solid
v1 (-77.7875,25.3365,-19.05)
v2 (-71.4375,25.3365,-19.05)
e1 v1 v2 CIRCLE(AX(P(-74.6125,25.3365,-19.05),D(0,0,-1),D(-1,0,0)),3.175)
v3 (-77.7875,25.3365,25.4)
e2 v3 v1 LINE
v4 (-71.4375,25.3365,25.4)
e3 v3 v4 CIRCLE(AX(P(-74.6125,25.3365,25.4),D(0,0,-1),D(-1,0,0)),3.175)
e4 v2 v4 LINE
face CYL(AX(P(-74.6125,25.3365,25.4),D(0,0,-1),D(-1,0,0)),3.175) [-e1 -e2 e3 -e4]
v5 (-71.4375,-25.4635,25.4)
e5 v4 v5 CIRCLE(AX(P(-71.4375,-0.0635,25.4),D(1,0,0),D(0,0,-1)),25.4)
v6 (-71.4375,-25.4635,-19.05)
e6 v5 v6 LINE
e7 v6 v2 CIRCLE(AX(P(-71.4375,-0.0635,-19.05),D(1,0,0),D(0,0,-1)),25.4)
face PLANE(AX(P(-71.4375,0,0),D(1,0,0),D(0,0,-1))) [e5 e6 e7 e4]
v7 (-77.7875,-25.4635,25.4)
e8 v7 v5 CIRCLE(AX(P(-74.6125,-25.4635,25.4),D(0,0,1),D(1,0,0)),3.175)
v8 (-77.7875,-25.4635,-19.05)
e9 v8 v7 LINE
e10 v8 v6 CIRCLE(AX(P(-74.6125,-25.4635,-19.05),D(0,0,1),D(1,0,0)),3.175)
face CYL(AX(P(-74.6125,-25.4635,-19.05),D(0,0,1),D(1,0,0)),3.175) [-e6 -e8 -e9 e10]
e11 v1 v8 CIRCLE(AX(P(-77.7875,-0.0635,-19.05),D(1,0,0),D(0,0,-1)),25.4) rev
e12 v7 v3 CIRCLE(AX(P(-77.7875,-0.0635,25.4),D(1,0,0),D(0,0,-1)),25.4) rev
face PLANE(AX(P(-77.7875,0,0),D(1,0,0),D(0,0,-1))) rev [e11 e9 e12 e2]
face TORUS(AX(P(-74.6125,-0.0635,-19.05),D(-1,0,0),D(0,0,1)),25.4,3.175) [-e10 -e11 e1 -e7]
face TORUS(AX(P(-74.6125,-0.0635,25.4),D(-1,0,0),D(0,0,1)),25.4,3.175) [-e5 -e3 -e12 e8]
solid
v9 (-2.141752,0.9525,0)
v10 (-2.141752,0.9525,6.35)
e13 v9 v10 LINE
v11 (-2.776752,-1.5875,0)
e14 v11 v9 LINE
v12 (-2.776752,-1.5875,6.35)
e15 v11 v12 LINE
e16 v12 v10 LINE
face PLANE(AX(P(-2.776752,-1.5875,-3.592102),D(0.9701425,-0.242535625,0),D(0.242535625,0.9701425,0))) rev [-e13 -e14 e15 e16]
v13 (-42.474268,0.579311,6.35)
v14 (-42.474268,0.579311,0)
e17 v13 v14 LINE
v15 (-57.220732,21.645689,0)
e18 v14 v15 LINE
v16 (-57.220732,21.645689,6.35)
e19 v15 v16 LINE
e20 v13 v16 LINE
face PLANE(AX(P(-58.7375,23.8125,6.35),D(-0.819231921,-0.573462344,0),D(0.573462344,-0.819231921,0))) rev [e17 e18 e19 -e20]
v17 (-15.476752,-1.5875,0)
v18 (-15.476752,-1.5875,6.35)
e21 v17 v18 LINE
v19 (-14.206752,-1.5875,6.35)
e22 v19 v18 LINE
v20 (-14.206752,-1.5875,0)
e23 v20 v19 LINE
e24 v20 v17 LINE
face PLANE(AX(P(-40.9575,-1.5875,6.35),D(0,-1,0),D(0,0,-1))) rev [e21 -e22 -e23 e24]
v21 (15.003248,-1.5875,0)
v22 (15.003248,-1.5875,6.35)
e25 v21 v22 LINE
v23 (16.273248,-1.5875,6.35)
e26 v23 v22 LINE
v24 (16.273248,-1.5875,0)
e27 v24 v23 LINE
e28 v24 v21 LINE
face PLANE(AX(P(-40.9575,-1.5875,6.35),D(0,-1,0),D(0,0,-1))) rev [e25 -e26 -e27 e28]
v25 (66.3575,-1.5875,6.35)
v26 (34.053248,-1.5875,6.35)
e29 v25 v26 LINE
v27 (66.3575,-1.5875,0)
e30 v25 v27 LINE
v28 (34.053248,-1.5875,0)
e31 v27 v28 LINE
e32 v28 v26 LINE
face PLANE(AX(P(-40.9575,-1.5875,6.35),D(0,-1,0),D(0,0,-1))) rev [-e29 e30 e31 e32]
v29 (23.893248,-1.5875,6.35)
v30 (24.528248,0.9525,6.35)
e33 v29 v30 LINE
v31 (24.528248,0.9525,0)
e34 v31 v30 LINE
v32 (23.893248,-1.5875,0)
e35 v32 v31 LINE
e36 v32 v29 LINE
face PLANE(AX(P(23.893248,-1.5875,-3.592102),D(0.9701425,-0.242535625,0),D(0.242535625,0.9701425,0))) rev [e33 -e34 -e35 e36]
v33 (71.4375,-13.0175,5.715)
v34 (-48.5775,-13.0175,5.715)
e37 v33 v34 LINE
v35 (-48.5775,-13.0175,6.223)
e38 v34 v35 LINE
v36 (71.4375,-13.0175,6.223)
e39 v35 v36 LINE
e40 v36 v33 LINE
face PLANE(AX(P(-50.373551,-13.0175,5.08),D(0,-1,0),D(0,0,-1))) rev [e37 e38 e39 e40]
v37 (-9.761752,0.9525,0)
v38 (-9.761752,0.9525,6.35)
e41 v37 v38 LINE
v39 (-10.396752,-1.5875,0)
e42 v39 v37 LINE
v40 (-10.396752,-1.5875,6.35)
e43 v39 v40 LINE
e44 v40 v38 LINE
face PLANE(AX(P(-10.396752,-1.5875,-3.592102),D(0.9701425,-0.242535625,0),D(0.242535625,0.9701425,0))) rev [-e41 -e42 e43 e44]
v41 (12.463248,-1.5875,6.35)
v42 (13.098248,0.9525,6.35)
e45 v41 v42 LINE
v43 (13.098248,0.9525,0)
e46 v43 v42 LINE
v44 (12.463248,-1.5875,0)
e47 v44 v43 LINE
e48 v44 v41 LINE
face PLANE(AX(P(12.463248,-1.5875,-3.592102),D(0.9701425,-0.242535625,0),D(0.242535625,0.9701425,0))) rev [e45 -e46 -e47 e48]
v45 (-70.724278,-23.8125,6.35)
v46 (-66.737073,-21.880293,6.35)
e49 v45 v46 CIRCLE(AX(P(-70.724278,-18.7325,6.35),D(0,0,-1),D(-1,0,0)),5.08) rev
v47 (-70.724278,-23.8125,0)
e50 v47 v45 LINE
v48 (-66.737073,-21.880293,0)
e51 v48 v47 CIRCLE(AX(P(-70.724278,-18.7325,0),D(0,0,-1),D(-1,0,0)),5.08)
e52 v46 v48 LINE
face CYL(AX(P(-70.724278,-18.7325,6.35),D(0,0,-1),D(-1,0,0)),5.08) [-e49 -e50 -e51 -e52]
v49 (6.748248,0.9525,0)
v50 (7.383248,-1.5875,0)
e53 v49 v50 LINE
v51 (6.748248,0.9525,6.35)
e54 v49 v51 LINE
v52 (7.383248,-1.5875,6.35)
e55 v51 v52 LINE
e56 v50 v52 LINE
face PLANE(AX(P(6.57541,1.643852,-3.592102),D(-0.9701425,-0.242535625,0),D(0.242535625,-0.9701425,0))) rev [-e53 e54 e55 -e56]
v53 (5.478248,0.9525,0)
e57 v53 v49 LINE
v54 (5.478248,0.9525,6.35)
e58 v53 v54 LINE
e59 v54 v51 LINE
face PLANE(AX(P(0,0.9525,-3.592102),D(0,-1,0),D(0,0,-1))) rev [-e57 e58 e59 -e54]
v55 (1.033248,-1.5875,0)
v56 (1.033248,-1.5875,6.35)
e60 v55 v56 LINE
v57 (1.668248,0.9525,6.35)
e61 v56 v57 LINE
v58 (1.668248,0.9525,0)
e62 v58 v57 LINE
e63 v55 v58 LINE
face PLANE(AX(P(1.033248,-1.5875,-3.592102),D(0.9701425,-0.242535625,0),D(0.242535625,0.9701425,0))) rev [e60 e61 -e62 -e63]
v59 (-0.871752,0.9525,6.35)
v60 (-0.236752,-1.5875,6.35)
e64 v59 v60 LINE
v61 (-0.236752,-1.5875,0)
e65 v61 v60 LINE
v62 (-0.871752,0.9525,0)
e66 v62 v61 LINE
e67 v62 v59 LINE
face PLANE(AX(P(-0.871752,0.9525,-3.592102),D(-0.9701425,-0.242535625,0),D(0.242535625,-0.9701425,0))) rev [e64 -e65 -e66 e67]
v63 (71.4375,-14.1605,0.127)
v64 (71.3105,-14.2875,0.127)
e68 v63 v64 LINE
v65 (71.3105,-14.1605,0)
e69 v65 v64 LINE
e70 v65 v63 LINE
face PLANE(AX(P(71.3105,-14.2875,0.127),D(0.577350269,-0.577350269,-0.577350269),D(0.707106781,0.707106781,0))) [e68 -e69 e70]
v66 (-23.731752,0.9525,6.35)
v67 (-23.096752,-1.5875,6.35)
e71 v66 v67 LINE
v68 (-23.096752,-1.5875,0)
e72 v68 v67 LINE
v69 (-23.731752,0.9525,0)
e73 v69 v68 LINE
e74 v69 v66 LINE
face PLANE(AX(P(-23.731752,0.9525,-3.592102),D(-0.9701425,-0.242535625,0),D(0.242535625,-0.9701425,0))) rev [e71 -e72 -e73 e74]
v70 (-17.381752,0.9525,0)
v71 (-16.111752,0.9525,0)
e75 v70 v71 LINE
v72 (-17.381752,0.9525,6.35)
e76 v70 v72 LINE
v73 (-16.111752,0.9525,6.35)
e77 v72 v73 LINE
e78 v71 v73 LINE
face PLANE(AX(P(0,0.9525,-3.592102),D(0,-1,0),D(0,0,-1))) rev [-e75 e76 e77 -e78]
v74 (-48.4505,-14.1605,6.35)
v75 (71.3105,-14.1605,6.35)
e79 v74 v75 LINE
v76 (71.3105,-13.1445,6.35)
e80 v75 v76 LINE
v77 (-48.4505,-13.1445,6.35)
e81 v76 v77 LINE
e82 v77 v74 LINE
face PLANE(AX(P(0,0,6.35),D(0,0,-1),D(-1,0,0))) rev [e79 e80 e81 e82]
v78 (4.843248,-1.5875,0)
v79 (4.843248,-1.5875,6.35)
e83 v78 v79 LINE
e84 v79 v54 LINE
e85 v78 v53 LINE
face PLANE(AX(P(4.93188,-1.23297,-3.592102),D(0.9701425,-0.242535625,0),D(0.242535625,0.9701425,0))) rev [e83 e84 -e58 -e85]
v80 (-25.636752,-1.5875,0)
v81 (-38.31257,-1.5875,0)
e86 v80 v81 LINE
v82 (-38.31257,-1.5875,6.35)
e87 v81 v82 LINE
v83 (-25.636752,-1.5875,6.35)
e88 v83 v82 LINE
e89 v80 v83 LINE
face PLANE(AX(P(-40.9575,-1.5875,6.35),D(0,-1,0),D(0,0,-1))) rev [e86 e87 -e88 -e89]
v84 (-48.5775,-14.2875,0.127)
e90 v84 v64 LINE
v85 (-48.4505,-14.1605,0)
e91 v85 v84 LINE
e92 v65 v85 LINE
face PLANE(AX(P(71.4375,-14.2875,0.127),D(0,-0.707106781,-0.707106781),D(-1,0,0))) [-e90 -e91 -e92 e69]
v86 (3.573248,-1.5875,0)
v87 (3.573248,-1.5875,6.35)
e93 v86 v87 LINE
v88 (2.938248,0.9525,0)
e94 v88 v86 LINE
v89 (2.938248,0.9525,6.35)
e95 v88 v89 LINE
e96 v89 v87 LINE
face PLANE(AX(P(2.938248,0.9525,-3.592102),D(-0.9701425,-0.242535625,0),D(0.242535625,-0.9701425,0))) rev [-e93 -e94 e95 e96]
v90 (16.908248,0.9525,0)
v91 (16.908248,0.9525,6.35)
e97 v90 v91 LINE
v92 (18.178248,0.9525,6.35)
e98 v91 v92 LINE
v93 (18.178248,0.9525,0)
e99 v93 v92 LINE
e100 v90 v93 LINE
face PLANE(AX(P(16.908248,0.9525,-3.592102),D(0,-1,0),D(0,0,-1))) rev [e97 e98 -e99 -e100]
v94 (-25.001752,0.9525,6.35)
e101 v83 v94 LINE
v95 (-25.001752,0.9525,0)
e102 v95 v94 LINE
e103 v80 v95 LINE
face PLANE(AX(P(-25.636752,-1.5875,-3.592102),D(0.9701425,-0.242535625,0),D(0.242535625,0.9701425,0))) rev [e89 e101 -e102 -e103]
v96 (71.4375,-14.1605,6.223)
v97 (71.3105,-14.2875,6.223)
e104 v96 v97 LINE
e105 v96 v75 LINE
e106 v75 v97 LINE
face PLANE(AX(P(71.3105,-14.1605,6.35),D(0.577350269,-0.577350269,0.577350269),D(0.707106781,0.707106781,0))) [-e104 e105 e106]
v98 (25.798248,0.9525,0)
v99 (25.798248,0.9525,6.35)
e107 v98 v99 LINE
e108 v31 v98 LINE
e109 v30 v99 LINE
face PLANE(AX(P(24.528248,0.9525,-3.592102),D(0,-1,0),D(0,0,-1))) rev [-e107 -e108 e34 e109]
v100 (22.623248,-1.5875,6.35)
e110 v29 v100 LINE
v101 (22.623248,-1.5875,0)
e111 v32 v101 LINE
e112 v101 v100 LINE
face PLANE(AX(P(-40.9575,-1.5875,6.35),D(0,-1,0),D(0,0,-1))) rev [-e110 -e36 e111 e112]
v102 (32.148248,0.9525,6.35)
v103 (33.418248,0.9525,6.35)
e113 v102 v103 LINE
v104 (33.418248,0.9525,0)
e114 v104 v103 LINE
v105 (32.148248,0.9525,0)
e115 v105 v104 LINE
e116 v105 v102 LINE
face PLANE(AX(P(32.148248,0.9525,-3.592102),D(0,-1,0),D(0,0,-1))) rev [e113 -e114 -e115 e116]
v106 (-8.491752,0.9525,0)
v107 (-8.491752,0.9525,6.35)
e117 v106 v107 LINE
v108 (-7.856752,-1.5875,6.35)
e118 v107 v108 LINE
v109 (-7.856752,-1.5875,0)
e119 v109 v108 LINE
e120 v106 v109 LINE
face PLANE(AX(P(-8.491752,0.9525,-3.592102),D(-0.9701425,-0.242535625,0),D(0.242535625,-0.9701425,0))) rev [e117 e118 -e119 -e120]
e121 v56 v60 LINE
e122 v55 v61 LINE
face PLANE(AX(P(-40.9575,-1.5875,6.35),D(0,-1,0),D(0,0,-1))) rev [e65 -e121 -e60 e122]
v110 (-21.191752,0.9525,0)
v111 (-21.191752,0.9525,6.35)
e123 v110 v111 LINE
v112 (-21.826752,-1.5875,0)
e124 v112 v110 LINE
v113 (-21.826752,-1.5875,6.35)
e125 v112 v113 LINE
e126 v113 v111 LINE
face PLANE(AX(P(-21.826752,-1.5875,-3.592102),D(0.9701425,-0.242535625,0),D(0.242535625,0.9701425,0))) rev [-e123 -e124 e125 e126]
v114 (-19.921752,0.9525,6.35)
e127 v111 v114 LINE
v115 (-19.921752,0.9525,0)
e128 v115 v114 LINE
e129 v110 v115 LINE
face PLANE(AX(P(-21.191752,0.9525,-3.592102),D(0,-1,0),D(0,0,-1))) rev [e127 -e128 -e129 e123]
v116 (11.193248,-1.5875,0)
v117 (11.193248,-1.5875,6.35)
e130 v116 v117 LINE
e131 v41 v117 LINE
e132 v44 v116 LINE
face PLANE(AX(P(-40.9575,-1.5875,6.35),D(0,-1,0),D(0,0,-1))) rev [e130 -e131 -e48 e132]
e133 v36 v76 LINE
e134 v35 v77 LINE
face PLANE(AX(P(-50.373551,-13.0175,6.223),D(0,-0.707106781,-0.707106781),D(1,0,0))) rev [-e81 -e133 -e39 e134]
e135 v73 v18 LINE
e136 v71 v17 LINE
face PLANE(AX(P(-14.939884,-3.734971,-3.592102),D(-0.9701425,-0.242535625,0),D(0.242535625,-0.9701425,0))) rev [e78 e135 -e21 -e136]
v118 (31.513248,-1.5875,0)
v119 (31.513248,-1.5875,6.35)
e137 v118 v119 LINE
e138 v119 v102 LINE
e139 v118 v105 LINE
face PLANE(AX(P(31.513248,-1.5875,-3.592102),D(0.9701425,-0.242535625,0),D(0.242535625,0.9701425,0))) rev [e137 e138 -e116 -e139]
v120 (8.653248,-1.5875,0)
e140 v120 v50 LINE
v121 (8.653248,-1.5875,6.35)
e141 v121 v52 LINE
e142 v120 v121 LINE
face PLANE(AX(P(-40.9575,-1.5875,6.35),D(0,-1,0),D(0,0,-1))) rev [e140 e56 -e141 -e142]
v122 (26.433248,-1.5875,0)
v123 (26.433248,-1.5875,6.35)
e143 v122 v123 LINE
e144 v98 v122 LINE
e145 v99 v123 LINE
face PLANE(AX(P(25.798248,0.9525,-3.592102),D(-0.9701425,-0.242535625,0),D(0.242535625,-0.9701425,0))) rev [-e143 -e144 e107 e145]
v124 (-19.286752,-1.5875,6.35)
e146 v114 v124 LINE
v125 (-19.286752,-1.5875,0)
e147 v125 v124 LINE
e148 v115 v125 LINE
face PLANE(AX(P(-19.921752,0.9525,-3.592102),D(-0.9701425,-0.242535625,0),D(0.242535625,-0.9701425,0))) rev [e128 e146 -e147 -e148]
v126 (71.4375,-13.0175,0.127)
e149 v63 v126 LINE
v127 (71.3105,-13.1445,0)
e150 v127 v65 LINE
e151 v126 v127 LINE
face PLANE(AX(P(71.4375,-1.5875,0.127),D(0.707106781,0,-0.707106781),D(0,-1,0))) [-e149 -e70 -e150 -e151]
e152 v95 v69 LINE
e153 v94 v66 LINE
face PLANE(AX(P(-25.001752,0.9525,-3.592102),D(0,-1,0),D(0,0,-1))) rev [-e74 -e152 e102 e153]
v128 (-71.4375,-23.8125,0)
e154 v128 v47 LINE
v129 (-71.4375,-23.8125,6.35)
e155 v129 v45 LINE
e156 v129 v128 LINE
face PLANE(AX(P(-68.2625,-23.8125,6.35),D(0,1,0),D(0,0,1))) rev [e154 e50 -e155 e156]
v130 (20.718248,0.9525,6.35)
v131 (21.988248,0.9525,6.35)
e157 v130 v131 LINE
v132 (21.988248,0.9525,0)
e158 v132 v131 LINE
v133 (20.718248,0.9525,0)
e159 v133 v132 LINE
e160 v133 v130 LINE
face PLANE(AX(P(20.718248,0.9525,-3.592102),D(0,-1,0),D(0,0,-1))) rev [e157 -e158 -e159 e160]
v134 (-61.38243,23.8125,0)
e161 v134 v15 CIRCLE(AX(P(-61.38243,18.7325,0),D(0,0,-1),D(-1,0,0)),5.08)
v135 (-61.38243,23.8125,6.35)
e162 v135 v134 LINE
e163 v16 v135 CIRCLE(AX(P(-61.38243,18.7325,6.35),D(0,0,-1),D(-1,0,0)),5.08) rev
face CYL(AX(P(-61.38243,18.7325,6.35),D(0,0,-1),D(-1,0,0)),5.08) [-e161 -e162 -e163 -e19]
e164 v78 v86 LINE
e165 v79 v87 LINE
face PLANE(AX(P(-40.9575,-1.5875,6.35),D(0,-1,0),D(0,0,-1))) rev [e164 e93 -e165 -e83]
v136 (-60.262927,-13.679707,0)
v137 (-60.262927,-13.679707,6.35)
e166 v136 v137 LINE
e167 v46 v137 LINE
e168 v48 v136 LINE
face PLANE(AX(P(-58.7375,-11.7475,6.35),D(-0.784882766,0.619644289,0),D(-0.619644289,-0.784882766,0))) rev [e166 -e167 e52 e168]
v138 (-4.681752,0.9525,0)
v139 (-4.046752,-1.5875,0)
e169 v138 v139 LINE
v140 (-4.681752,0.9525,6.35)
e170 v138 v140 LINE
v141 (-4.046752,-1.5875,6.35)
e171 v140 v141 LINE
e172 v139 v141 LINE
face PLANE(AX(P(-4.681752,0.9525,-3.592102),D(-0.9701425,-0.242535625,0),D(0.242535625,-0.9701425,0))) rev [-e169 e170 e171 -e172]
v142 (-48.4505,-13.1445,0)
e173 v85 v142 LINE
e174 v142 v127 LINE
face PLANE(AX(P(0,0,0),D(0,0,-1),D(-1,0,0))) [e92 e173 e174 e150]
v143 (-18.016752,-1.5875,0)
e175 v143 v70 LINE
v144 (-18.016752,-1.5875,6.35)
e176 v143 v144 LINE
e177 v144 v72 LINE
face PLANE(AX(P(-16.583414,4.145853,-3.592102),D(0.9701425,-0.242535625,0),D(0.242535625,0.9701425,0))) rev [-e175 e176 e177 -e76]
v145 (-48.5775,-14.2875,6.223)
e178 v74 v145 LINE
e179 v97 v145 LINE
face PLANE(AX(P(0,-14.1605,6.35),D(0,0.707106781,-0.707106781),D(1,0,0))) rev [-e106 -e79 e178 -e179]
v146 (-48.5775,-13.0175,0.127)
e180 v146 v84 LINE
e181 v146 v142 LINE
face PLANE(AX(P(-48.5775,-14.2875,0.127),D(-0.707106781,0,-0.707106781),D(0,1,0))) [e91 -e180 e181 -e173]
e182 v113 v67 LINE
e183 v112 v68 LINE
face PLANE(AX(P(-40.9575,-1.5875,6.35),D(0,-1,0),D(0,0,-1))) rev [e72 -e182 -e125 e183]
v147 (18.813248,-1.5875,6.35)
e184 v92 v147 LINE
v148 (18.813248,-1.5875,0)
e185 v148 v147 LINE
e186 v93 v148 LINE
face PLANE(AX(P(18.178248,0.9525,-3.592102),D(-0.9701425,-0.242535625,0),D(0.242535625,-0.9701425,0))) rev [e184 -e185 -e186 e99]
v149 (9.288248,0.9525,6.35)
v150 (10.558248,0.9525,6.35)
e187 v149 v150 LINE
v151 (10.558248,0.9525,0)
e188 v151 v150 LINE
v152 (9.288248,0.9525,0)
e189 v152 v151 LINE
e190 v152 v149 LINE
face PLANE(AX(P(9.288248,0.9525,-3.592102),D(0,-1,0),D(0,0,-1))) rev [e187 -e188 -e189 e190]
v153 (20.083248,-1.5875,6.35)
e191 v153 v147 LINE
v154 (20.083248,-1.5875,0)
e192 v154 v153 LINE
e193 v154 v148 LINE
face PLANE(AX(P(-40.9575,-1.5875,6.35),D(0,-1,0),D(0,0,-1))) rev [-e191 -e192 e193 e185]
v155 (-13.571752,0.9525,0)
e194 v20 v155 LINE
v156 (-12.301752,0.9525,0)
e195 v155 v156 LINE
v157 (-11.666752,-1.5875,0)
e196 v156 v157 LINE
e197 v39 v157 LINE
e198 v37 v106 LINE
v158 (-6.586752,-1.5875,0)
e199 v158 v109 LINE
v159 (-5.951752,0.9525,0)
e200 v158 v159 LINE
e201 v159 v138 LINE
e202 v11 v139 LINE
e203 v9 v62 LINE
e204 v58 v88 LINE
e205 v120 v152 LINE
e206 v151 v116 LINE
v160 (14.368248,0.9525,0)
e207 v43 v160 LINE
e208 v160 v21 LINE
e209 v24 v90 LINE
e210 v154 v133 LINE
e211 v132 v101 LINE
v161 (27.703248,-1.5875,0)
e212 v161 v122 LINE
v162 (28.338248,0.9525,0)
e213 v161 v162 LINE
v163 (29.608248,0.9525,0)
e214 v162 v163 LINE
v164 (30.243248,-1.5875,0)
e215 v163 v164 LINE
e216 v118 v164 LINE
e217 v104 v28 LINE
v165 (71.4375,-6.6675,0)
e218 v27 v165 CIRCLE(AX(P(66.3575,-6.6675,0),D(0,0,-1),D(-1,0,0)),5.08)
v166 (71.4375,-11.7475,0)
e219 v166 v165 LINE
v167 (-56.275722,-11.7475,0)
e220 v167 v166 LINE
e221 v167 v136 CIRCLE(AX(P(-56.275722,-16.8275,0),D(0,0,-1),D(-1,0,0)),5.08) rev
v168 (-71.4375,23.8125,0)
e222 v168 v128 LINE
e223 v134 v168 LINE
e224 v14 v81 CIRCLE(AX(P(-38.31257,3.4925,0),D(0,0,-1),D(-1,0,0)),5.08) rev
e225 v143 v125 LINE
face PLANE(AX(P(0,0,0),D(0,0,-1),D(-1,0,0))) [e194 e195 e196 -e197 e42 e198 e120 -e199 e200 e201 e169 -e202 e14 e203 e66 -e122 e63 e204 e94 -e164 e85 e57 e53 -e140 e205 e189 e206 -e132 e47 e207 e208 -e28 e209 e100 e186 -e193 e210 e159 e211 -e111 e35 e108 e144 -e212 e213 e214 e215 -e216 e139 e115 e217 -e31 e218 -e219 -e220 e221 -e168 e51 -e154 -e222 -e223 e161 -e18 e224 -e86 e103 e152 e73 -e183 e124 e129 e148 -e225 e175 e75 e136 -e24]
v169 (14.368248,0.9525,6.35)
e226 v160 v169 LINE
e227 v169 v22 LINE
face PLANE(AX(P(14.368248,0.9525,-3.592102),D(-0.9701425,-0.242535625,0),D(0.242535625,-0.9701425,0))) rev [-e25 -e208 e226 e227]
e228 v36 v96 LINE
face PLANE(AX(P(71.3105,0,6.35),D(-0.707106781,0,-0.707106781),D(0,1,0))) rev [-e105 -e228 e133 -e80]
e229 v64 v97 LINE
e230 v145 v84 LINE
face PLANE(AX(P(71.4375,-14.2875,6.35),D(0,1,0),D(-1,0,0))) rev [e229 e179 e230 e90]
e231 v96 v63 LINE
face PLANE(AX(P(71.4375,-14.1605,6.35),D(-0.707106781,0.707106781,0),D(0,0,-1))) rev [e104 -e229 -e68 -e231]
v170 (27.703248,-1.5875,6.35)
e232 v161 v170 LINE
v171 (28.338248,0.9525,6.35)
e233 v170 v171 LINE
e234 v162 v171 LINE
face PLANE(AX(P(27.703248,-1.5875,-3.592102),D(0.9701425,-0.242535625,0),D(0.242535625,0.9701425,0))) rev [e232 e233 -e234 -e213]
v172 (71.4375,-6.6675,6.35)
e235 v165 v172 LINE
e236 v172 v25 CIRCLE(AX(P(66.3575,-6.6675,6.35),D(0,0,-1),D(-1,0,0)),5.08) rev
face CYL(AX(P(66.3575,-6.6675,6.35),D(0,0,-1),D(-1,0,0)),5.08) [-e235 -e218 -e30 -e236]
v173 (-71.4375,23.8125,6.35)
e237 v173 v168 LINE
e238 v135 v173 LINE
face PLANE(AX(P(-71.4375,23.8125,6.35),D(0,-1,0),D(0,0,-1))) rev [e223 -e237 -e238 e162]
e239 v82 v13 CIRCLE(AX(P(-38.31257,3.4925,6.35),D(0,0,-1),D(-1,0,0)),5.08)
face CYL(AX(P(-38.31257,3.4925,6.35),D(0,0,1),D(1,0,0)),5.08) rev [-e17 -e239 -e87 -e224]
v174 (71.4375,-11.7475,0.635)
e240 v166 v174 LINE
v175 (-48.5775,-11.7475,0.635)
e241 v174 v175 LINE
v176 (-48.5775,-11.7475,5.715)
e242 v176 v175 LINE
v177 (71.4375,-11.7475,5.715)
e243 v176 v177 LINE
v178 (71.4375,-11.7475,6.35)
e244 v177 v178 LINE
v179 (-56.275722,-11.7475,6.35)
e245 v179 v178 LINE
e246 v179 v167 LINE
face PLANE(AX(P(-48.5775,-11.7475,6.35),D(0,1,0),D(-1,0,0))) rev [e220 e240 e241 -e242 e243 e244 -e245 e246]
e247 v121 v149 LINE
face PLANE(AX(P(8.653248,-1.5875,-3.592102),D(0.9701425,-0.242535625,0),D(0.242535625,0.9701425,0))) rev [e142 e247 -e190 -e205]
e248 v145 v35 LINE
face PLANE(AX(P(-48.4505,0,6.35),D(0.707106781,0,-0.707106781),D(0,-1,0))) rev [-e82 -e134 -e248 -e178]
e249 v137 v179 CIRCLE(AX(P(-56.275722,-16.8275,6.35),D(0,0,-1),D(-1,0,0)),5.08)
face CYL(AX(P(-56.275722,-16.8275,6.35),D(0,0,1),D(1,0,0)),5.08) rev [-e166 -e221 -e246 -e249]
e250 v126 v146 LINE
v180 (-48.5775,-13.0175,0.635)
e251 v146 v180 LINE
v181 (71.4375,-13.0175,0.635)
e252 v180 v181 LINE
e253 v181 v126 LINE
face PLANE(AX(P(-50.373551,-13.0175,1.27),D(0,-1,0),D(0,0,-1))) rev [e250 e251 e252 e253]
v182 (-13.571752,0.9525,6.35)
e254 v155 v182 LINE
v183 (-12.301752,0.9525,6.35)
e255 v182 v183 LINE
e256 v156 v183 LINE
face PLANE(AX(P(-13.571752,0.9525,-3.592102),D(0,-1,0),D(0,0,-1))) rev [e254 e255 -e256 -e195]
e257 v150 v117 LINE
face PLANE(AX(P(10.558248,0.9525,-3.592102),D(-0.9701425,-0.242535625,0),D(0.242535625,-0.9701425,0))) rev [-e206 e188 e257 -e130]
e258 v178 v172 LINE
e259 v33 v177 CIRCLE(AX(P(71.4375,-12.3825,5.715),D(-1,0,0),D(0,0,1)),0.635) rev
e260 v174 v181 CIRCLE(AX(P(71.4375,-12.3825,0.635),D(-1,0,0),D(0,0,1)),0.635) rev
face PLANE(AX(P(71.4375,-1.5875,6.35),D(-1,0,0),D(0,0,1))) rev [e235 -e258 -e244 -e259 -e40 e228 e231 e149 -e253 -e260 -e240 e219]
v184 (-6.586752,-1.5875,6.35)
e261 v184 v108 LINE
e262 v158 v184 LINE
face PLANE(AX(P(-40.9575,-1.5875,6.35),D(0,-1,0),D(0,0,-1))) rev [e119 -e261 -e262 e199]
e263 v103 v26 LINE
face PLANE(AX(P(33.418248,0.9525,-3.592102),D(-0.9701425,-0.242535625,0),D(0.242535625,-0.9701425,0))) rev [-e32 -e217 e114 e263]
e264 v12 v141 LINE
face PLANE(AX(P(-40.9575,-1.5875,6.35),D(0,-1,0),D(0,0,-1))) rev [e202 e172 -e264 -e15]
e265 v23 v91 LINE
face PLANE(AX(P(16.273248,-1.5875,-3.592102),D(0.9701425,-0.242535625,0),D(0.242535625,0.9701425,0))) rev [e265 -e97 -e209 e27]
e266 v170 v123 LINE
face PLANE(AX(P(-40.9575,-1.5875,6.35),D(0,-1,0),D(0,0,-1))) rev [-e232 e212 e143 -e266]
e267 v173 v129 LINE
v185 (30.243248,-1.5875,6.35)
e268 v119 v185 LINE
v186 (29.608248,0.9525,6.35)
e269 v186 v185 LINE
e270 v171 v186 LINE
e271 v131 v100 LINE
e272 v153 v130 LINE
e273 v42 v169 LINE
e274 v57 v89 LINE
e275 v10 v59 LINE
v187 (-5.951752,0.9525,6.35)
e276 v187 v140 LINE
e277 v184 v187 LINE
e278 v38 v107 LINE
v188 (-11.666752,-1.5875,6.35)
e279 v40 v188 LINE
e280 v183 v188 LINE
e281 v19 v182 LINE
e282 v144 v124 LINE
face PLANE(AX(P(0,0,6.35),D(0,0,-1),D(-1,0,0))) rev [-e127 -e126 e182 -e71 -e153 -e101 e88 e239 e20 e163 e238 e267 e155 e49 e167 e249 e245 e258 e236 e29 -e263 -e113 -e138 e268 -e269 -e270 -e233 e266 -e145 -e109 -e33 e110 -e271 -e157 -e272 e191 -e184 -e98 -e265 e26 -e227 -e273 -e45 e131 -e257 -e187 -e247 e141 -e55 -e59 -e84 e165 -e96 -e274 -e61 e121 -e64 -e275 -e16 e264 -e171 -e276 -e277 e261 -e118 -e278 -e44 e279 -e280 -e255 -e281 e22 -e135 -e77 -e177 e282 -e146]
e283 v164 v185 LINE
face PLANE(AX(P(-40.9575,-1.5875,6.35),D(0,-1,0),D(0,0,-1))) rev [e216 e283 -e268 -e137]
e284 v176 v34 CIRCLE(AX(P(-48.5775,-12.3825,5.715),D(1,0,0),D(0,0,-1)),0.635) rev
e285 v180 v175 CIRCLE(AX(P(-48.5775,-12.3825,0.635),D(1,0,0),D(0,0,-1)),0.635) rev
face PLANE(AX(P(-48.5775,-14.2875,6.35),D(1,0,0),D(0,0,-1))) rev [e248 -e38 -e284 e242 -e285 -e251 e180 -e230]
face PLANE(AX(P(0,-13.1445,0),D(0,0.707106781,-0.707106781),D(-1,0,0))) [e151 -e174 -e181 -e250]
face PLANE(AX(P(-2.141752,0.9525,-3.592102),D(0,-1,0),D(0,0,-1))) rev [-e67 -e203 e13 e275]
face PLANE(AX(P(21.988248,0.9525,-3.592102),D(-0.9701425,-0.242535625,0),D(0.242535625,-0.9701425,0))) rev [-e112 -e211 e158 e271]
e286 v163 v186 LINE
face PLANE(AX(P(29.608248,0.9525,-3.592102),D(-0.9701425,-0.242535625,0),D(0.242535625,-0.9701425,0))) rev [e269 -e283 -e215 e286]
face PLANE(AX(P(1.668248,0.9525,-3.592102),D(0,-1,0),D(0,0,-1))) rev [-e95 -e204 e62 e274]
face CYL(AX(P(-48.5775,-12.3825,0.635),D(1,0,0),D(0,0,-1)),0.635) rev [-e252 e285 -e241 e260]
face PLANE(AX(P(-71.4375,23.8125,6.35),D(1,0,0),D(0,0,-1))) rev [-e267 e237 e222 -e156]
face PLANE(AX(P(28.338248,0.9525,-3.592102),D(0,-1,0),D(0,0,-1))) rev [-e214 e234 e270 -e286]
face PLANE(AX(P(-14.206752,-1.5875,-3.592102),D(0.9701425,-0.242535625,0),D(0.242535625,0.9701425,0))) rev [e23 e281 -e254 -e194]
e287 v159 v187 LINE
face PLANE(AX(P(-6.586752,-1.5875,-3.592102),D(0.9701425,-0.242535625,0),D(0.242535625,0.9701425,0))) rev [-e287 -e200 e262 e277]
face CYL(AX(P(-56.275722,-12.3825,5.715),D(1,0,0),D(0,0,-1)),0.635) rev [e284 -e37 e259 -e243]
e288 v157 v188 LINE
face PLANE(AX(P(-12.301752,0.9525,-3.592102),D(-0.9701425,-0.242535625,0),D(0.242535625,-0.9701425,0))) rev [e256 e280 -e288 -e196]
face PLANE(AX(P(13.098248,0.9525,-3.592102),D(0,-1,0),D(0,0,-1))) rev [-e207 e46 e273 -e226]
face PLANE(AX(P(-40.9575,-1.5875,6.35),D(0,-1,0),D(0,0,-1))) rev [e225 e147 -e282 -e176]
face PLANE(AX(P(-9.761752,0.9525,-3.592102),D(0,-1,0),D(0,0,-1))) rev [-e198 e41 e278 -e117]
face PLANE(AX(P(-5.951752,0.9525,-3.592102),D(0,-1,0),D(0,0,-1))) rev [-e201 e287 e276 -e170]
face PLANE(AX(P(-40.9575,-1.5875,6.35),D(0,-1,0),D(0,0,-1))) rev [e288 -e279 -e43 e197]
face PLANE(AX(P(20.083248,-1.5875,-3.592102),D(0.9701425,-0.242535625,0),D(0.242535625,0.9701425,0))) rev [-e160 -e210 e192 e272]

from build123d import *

# Parameters (mm, degrees)
BOSS_EXTRUDE1_DEPTH = 6.35
FILLET1_R           = 5.08
FILLET2_R           = 5.08
FILLET3_R           = 5.08
SKETCH2_W           = 1.27
SKETCH2_H           = 1.27
CUT_EXTRUDE1_DEPTH  = 120.015
FILLET5_R           = 0.635
FILLET6_R           = 0.635
CHAMFER1_SIZE       = 0.127
BOSS_EXTRUDE2_DEPTH = 6.35
SKETCH4_W           = 101.6
SKETCH4_H           = 57.15
BOSS_EXTRUDE3_DEPTH = 6.35
FILLET7_RADIUS      = 28.575
FILLET7_LENGTH      = 6.35
FILLET8_RADIUS      = 28.575
FILLET8_LENGTH      = 6.35
FILLET9_R           = 3.175


with BuildPart() as part:
    # Sketch1 → Boss-Extrude1 (new body)
    with BuildSketch(Plane.XY):
        Polygon((-71.4375, 23.8125), (-58.7375, 23.8125), (-40.9575, -1.5875), (71.4375, -1.5875), (71.4375, -14.2875), (-48.5775, -14.2875), (-48.5775, -11.7475), (-58.7375, -11.7475), (-68.2625, -23.8125), (-71.4375, -23.8125), align=None)
    extrude(amount=BOSS_EXTRUDE1_DEPTH)

    # Fillet1
    fillet1_edges = [part.edges().sort_by_distance(p)[0] for p in [
        (-58.7375, 23.8125, 3.175),
    ]]
    fillet(fillet1_edges, radius=FILLET1_R)

    # Fillet2
    fillet2_edges = [part.edges().sort_by_distance(p)[0] for p in [
        (-40.9575, -1.5875, 3.175),
        (-58.7375, -11.7475, 3.175),
        (-68.2625, -23.8125, 3.175),
    ]]
    fillet(fillet2_edges, radius=FILLET2_R)

    # Fillet3
    fillet3_edges = [part.edges().sort_by_distance(p)[0] for p in [
        (71.4375, -1.5875, 3.175),
    ]]
    fillet(fillet3_edges, radius=FILLET3_R)

    # Sketch2 → Cut-Extrude1 (cut)
    with BuildSketch(Plane(origin=(71.4375, 0, 0), x_dir=(0, 0, -1), z_dir=(1, 0, 0))):
        with Locations((-5.715, -12.3825)):
            Rectangle(SKETCH2_W, SKETCH2_H)
        with Locations((-0.635, -12.3825)):
            Rectangle(SKETCH2_W, SKETCH2_H)
    extrude(amount=-CUT_EXTRUDE1_DEPTH, mode=Mode.SUBTRACT)

    # Fillet5
    fillet5_edges = [part.edges().sort_by_distance(p)[0] for p in [
        (11.43, -11.7475, 1.27),
        (11.43, -13.0175, 1.27),
    ]]
    fillet(fillet5_edges, radius=FILLET5_R - 0.0001)  # a hair under: the kernel refuses the full size

    # Fillet6
    fillet6_edges = [part.edges().sort_by_distance(p)[0] for p in [
        (11.43, -11.7475, 5.08),
        (11.43, -13.0175, 5.08),
    ]]
    fillet(fillet6_edges, radius=FILLET6_R - 0.0001)  # a hair under: the kernel refuses the full size

    # Chamfer1
    chamfer1_edges = [part.edges().sort_by_distance(p)[0] for p in [
        (71.4375, -13.6525, 0),
        (11.43, -14.2875, 0),
        (71.4375, -14.2875, 3.175),
        (11.43, -14.2875, 6.35),
        (71.4375, -13.6525, 6.35),
        (-48.5775, -13.6525, 0),
        (-48.5775, -13.6525, 6.35),
        (11.43, -13.0175, 6.35),
        (11.43, -13.0175, 0),
    ]]
    chamfer(chamfer1_edges, length=CHAMFER1_SIZE)

    # Sketch3 → Boss-Extrude2 (add)
    with BuildSketch(Plane.XY.offset(6.35)):
        Polygon((-18.01675216, -1.5875), (-15.47675216, -1.5875), (-16.11175216, 0.9525), (-17.38175216, 0.9525), align=None)
        Polygon((5.47824784, 0.9525), (4.84324784, -1.5875), (7.38324784, -1.5875), (6.74824784, 0.9525), align=None)
        Polygon((-25.63675216, -1.5875), (-25.00175216, 0.9525), (-23.73175216, 0.9525), (-23.09675216, -1.5875), align=None)
        Polygon((-21.82675216, -1.5875), (-21.19175216, 0.9525), (-19.92175216, 0.9525), (-19.28675216, -1.5875), align=None)
        Polygon((-12.30175216, 0.9525), (-11.66675216, -1.5875), (-14.20675216, -1.5875), (-13.57175216, 0.9525), align=None)
        Polygon((-8.49175216, 0.9525), (-7.85675216, -1.5875), (-10.39675216, -1.5875), (-9.76175216, 0.9525), align=None)
        Polygon((-4.68175216, 0.9525), (-4.04675216, -1.5875), (-6.58675216, -1.5875), (-5.95175216, 0.9525), align=None)
        Polygon((-2.77675216, -1.5875), (-2.14175216, 0.9525), (-0.87175216, 0.9525), (-0.23675216, -1.5875), align=None)
        Polygon((2.93824784, 0.9525), (3.57324784, -1.5875), (1.03324784, -1.5875), (1.66824784, 0.9525), align=None)
        Polygon((10.55824784, 0.9525), (11.19324784, -1.5875), (8.65324784, -1.5875), (9.28824784, 0.9525), align=None)
        Polygon((14.36824784, 0.9525), (15.00324784, -1.5875), (12.46324784, -1.5875), (13.09824784, 0.9525), align=None)
        Polygon((18.17824784, 0.9525), (18.81324784, -1.5875), (16.27324784, -1.5875), (16.90824784, 0.9525), align=None)
        Polygon((21.98824784, 0.9525), (22.62324784, -1.5875), (20.08324784, -1.5875), (20.71824784, 0.9525), align=None)
        Polygon((25.79824784, 0.9525), (26.43324784, -1.5875), (23.89324784, -1.5875), (24.52824784, 0.9525), align=None)
        Polygon((27.70324784, -1.5875), (28.33824784, 0.9525), (29.60824784, 0.9525), (30.24324784, -1.5875), align=None)
        Polygon((33.41824784, 0.9525), (34.05324784, -1.5875), (31.51324784, -1.5875), (32.14824784, 0.9525), align=None)
    extrude(amount=-BOSS_EXTRUDE2_DEPTH)


with BuildPart() as body_2:
    # Sketch4 → Boss-Extrude3 (new body)
    with BuildSketch(Plane.ZY.offset(71.4375)):
        with Locations((3.175, -0.0635)):
            Rectangle(SKETCH4_W, SKETCH4_H)
    extrude(amount=BOSS_EXTRUDE3_DEPTH)

    # Fillet7: full round fillet: the end face becomes a half cylinder, R = half its width
    fillet7_face = Plane((-74.6125, -0.0635, -47.625), x_dir=(-1, 0, 0), z_dir=(0, 0, -1))  # on the end face: x along it, z out of the body
    fillet7_slab = fillet7_face.offset(-FILLET7_RADIUS / 2) * Box(FILLET7_LENGTH, 2 * FILLET7_RADIUS, FILLET7_RADIUS, mode=Mode.PRIVATE)  # the body's end, R deep
    fillet7_round = Plane((-74.6125, -0.0635, -19.05), x_dir=(0, 0, -1), z_dir=(-1, 0, 0)) * Cylinder(FILLET7_RADIUS, FILLET7_LENGTH, mode=Mode.PRIVATE)  # its axis R under the face
    add(fillet7_slab - fillet7_round, mode=Mode.SUBTRACT)

    # Fillet8: full round fillet: the end face becomes a half cylinder, R = half its width
    fillet8_face = Plane((-74.6125, -0.0635, 53.975), x_dir=(1, 0, 0), z_dir=(0, 0, 1))  # on the end face: x along it, z out of the body
    fillet8_slab = fillet8_face.offset(-FILLET8_RADIUS / 2) * Box(FILLET8_LENGTH, 2 * FILLET8_RADIUS, FILLET8_RADIUS, mode=Mode.PRIVATE)  # the body's end, R deep
    fillet8_round = Plane((-74.6125, -0.0635, 25.4), x_dir=(0, 0, 1), z_dir=(1, 0, 0)) * Cylinder(FILLET8_RADIUS, FILLET8_LENGTH, mode=Mode.PRIVATE)  # its axis R under the face
    add(fillet8_slab - fillet8_round, mode=Mode.SUBTRACT)

    # Fillet9
    fillet9_edges = [body_2.edges().sort_by_distance(p)[0] for p in [
        (-71.4375, -28.6385, 3.175),
        (-77.7875, -28.6385, 3.175),
        (-71.4375, -0.0635, -47.625),
        (-71.4375, 28.5115, 3.175),
        (-77.7875, 28.5115, 3.175),
        (-77.7875, -0.0635, 53.975),
    ]]
    fillet(fillet9_edges, radius=FILLET9_R - 0.0001)  # a hair under: the kernel refuses the full size


solid = Compound([part.part, body_2.part])
